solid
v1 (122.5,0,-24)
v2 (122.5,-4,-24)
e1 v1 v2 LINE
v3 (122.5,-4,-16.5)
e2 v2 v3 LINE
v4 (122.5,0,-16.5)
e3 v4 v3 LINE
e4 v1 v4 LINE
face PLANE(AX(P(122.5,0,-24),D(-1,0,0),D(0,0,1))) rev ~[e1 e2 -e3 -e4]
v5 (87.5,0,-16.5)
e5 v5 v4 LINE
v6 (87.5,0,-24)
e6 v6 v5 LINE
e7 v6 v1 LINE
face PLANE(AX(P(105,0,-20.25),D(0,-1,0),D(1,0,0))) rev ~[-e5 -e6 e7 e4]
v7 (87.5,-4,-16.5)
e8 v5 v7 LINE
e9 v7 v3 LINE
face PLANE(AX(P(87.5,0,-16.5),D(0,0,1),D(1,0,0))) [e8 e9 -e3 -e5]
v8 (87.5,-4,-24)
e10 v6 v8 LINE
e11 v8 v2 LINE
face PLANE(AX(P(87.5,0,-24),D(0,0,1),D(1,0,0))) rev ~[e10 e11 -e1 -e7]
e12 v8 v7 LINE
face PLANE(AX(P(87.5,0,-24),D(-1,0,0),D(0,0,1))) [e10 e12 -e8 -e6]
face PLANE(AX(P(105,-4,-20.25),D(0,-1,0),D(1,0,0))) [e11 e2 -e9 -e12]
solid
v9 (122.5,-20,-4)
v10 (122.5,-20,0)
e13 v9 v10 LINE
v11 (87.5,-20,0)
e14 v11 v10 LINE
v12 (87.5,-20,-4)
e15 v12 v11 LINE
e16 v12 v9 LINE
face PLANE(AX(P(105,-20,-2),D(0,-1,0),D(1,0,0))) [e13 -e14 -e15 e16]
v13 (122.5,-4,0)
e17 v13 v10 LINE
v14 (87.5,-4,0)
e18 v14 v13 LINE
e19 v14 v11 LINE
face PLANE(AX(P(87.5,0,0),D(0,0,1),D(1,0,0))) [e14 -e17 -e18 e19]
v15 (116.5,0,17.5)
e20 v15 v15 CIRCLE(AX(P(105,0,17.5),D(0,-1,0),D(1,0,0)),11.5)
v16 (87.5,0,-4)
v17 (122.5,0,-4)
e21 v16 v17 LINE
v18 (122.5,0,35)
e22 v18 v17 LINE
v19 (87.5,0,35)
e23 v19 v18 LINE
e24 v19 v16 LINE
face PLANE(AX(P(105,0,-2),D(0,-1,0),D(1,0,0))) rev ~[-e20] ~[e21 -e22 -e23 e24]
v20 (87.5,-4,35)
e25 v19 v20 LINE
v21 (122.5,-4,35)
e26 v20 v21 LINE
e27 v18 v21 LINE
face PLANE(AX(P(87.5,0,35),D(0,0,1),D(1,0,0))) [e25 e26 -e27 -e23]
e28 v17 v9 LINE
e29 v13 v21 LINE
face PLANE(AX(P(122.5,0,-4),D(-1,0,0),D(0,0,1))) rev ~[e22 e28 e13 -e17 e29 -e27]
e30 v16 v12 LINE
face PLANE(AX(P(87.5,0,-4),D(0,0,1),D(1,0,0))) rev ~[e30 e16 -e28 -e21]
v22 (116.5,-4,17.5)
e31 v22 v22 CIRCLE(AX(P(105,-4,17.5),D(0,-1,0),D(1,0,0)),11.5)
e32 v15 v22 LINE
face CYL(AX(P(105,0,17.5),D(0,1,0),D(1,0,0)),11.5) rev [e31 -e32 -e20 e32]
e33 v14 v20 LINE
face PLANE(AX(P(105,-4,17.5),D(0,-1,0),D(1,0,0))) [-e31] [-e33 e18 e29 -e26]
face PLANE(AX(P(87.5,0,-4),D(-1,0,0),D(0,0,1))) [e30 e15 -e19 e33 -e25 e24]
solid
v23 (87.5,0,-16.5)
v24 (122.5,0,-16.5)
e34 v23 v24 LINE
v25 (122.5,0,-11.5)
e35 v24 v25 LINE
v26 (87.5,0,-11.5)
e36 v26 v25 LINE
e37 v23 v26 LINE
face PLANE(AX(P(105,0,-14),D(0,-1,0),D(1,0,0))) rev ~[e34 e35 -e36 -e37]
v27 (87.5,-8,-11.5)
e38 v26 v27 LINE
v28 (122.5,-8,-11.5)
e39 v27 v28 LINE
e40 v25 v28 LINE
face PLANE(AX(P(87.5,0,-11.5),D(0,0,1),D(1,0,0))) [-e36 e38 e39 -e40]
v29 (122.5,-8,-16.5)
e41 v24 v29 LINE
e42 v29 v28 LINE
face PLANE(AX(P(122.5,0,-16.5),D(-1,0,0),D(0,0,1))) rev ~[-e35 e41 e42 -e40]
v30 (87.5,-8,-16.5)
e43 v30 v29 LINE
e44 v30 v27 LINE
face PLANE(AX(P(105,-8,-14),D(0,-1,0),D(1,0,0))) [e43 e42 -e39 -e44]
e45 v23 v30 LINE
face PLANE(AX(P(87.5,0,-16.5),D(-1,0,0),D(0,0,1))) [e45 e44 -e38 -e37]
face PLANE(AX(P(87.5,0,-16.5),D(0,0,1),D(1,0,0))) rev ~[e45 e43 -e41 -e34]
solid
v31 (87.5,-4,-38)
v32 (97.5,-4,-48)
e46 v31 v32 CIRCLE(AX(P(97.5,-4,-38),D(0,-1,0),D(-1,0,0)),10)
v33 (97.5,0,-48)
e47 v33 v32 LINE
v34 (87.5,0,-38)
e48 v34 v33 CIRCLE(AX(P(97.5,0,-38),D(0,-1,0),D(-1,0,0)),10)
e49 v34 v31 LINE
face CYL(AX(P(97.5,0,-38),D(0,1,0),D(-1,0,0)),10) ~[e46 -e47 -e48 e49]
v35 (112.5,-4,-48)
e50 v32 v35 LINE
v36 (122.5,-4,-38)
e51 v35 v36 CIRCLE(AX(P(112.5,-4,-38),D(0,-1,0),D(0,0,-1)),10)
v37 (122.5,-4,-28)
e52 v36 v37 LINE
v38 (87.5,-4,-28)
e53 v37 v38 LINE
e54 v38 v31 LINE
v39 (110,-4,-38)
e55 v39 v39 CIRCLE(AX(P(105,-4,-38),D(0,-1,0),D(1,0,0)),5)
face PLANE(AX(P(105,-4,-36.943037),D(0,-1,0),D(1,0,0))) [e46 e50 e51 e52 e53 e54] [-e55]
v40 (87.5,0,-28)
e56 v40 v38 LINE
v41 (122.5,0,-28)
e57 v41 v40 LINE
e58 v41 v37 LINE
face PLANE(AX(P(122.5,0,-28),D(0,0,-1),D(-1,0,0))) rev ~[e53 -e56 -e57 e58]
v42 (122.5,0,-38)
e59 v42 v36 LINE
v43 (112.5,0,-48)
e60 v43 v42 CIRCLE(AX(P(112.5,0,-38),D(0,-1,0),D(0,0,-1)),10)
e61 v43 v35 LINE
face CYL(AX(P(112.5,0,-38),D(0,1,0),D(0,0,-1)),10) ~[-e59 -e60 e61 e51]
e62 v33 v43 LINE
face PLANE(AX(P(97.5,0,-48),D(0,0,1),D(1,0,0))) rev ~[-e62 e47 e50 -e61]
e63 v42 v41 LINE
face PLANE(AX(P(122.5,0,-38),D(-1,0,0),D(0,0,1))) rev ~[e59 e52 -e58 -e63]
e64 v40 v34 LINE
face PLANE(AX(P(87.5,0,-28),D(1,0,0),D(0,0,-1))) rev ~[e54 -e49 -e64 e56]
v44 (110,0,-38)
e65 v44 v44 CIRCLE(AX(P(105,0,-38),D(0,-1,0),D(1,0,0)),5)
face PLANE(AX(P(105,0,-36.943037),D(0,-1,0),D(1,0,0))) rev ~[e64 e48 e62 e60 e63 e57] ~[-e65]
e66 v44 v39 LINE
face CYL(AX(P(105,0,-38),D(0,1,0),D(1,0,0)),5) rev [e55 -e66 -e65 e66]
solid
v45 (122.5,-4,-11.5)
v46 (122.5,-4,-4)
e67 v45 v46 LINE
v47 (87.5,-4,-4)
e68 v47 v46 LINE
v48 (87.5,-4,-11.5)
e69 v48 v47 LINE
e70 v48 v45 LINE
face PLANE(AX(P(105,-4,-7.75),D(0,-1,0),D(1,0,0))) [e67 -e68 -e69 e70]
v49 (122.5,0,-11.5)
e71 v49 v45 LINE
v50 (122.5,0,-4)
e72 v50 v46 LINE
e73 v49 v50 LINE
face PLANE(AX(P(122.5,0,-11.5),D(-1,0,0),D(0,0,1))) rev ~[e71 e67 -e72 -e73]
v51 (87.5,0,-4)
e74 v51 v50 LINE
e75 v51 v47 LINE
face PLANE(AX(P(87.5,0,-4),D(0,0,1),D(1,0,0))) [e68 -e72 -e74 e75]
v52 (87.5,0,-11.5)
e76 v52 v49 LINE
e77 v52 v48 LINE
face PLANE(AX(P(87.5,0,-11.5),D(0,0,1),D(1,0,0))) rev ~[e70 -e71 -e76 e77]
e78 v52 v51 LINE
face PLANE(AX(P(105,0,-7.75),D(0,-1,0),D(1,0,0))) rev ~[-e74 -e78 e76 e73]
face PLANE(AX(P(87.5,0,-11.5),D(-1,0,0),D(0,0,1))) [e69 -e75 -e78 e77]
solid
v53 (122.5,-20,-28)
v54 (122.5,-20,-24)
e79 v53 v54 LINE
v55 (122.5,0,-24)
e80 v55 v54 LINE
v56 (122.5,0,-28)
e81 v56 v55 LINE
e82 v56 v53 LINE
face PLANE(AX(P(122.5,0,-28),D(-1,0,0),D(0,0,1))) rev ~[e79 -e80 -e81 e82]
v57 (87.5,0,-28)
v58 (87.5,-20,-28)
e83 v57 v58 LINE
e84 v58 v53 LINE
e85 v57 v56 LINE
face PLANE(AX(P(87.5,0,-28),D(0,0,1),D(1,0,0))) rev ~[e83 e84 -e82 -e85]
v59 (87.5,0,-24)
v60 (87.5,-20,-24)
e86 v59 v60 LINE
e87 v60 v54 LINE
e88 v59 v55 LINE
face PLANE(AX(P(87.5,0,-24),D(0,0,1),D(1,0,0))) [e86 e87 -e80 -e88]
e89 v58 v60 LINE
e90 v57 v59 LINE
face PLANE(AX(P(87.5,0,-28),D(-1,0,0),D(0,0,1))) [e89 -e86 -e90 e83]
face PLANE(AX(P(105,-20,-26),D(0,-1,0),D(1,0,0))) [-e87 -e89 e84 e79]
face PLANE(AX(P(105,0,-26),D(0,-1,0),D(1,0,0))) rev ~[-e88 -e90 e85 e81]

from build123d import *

# Parameters (mm, degrees)
F0_W     = 35
F0_H     = 35
F0_R     = 11.5
F1_DEPTH = 4
F0_H_2   = 7.5
F0_R_2   = 5
F0_H_3   = 4
F2_DEPTH = 20
F0_H_4   = 5
F3_DEPTH = 8


with BuildPart() as f1:
    # F0 (on Front) → F1 (new body)
    with BuildSketch(Plane.XZ):
        with Locations((105, 17.5)):
            Rectangle(F0_W, F0_H)
        with Locations((105, 17.5)):
            Circle(F0_R, mode=Mode.SUBTRACT)
    extrude(amount=F1_DEPTH)

    # F0 (on Front) → F2 (join)
    with BuildSketch(Plane.XZ):
        with Locations((105, -2)):
            Rectangle(F0_W, F0_H_3)
    extrude(amount=F2_DEPTH)


with BuildPart() as f1b:
    # F0 (on Front) → F1, piece 2 (new body)
    with BuildSketch(Plane.XZ):
        with Locations((105, -7.75)):
            Rectangle(F0_W, F0_H_2)
    extrude(amount=F1_DEPTH)


with BuildPart() as f1c:
    # F0 (on Front) → F1, piece 3 (new body)
    with BuildSketch(Plane.XZ):
        with Locations((105, -20.25)):
            Rectangle(F0_W, F0_H_2)
    extrude(amount=F1_DEPTH)


with BuildPart() as f1d:
    # F0 (on Front) → F1, piece 4 (new body)
    with BuildSketch(Plane.XZ):
        with BuildLine():
            Line((122.5, -28), (87.5, -28))
            Line((87.5, -28), (87.5, -38))
            ThreePointArc((87.5, -38), (90.4289321881, -45.0710678119), (97.5, -48))
            Line((97.5, -48), (112.5, -48))
            ThreePointArc((112.5, -48), (119.5710678119, -45.0710678119), (122.5, -38))
            Line((122.5, -38), (122.5, -28))
        make_face()
        with Locations((105, -38)):
            Circle(F0_R_2, mode=Mode.SUBTRACT)
    extrude(amount=F1_DEPTH)


with BuildPart() as f2:
    # F0 (on Front) → F2, piece 2 (new body)
    with BuildSketch(Plane.XZ):
        with Locations((105, -26)):
            Rectangle(F0_W, F0_H_3)
    extrude(amount=F2_DEPTH)


with BuildPart() as f3:
    # F0 (on Front) → F3 (new body)
    with BuildSketch(Plane.XZ):
        with Locations((105, -14)):
            Rectangle(F0_W, F0_H_4)
    extrude(amount=F3_DEPTH)


solid = Compound([f1.part, f1b.part, f1c.part, f1d.part, f2.part, f3.part])
